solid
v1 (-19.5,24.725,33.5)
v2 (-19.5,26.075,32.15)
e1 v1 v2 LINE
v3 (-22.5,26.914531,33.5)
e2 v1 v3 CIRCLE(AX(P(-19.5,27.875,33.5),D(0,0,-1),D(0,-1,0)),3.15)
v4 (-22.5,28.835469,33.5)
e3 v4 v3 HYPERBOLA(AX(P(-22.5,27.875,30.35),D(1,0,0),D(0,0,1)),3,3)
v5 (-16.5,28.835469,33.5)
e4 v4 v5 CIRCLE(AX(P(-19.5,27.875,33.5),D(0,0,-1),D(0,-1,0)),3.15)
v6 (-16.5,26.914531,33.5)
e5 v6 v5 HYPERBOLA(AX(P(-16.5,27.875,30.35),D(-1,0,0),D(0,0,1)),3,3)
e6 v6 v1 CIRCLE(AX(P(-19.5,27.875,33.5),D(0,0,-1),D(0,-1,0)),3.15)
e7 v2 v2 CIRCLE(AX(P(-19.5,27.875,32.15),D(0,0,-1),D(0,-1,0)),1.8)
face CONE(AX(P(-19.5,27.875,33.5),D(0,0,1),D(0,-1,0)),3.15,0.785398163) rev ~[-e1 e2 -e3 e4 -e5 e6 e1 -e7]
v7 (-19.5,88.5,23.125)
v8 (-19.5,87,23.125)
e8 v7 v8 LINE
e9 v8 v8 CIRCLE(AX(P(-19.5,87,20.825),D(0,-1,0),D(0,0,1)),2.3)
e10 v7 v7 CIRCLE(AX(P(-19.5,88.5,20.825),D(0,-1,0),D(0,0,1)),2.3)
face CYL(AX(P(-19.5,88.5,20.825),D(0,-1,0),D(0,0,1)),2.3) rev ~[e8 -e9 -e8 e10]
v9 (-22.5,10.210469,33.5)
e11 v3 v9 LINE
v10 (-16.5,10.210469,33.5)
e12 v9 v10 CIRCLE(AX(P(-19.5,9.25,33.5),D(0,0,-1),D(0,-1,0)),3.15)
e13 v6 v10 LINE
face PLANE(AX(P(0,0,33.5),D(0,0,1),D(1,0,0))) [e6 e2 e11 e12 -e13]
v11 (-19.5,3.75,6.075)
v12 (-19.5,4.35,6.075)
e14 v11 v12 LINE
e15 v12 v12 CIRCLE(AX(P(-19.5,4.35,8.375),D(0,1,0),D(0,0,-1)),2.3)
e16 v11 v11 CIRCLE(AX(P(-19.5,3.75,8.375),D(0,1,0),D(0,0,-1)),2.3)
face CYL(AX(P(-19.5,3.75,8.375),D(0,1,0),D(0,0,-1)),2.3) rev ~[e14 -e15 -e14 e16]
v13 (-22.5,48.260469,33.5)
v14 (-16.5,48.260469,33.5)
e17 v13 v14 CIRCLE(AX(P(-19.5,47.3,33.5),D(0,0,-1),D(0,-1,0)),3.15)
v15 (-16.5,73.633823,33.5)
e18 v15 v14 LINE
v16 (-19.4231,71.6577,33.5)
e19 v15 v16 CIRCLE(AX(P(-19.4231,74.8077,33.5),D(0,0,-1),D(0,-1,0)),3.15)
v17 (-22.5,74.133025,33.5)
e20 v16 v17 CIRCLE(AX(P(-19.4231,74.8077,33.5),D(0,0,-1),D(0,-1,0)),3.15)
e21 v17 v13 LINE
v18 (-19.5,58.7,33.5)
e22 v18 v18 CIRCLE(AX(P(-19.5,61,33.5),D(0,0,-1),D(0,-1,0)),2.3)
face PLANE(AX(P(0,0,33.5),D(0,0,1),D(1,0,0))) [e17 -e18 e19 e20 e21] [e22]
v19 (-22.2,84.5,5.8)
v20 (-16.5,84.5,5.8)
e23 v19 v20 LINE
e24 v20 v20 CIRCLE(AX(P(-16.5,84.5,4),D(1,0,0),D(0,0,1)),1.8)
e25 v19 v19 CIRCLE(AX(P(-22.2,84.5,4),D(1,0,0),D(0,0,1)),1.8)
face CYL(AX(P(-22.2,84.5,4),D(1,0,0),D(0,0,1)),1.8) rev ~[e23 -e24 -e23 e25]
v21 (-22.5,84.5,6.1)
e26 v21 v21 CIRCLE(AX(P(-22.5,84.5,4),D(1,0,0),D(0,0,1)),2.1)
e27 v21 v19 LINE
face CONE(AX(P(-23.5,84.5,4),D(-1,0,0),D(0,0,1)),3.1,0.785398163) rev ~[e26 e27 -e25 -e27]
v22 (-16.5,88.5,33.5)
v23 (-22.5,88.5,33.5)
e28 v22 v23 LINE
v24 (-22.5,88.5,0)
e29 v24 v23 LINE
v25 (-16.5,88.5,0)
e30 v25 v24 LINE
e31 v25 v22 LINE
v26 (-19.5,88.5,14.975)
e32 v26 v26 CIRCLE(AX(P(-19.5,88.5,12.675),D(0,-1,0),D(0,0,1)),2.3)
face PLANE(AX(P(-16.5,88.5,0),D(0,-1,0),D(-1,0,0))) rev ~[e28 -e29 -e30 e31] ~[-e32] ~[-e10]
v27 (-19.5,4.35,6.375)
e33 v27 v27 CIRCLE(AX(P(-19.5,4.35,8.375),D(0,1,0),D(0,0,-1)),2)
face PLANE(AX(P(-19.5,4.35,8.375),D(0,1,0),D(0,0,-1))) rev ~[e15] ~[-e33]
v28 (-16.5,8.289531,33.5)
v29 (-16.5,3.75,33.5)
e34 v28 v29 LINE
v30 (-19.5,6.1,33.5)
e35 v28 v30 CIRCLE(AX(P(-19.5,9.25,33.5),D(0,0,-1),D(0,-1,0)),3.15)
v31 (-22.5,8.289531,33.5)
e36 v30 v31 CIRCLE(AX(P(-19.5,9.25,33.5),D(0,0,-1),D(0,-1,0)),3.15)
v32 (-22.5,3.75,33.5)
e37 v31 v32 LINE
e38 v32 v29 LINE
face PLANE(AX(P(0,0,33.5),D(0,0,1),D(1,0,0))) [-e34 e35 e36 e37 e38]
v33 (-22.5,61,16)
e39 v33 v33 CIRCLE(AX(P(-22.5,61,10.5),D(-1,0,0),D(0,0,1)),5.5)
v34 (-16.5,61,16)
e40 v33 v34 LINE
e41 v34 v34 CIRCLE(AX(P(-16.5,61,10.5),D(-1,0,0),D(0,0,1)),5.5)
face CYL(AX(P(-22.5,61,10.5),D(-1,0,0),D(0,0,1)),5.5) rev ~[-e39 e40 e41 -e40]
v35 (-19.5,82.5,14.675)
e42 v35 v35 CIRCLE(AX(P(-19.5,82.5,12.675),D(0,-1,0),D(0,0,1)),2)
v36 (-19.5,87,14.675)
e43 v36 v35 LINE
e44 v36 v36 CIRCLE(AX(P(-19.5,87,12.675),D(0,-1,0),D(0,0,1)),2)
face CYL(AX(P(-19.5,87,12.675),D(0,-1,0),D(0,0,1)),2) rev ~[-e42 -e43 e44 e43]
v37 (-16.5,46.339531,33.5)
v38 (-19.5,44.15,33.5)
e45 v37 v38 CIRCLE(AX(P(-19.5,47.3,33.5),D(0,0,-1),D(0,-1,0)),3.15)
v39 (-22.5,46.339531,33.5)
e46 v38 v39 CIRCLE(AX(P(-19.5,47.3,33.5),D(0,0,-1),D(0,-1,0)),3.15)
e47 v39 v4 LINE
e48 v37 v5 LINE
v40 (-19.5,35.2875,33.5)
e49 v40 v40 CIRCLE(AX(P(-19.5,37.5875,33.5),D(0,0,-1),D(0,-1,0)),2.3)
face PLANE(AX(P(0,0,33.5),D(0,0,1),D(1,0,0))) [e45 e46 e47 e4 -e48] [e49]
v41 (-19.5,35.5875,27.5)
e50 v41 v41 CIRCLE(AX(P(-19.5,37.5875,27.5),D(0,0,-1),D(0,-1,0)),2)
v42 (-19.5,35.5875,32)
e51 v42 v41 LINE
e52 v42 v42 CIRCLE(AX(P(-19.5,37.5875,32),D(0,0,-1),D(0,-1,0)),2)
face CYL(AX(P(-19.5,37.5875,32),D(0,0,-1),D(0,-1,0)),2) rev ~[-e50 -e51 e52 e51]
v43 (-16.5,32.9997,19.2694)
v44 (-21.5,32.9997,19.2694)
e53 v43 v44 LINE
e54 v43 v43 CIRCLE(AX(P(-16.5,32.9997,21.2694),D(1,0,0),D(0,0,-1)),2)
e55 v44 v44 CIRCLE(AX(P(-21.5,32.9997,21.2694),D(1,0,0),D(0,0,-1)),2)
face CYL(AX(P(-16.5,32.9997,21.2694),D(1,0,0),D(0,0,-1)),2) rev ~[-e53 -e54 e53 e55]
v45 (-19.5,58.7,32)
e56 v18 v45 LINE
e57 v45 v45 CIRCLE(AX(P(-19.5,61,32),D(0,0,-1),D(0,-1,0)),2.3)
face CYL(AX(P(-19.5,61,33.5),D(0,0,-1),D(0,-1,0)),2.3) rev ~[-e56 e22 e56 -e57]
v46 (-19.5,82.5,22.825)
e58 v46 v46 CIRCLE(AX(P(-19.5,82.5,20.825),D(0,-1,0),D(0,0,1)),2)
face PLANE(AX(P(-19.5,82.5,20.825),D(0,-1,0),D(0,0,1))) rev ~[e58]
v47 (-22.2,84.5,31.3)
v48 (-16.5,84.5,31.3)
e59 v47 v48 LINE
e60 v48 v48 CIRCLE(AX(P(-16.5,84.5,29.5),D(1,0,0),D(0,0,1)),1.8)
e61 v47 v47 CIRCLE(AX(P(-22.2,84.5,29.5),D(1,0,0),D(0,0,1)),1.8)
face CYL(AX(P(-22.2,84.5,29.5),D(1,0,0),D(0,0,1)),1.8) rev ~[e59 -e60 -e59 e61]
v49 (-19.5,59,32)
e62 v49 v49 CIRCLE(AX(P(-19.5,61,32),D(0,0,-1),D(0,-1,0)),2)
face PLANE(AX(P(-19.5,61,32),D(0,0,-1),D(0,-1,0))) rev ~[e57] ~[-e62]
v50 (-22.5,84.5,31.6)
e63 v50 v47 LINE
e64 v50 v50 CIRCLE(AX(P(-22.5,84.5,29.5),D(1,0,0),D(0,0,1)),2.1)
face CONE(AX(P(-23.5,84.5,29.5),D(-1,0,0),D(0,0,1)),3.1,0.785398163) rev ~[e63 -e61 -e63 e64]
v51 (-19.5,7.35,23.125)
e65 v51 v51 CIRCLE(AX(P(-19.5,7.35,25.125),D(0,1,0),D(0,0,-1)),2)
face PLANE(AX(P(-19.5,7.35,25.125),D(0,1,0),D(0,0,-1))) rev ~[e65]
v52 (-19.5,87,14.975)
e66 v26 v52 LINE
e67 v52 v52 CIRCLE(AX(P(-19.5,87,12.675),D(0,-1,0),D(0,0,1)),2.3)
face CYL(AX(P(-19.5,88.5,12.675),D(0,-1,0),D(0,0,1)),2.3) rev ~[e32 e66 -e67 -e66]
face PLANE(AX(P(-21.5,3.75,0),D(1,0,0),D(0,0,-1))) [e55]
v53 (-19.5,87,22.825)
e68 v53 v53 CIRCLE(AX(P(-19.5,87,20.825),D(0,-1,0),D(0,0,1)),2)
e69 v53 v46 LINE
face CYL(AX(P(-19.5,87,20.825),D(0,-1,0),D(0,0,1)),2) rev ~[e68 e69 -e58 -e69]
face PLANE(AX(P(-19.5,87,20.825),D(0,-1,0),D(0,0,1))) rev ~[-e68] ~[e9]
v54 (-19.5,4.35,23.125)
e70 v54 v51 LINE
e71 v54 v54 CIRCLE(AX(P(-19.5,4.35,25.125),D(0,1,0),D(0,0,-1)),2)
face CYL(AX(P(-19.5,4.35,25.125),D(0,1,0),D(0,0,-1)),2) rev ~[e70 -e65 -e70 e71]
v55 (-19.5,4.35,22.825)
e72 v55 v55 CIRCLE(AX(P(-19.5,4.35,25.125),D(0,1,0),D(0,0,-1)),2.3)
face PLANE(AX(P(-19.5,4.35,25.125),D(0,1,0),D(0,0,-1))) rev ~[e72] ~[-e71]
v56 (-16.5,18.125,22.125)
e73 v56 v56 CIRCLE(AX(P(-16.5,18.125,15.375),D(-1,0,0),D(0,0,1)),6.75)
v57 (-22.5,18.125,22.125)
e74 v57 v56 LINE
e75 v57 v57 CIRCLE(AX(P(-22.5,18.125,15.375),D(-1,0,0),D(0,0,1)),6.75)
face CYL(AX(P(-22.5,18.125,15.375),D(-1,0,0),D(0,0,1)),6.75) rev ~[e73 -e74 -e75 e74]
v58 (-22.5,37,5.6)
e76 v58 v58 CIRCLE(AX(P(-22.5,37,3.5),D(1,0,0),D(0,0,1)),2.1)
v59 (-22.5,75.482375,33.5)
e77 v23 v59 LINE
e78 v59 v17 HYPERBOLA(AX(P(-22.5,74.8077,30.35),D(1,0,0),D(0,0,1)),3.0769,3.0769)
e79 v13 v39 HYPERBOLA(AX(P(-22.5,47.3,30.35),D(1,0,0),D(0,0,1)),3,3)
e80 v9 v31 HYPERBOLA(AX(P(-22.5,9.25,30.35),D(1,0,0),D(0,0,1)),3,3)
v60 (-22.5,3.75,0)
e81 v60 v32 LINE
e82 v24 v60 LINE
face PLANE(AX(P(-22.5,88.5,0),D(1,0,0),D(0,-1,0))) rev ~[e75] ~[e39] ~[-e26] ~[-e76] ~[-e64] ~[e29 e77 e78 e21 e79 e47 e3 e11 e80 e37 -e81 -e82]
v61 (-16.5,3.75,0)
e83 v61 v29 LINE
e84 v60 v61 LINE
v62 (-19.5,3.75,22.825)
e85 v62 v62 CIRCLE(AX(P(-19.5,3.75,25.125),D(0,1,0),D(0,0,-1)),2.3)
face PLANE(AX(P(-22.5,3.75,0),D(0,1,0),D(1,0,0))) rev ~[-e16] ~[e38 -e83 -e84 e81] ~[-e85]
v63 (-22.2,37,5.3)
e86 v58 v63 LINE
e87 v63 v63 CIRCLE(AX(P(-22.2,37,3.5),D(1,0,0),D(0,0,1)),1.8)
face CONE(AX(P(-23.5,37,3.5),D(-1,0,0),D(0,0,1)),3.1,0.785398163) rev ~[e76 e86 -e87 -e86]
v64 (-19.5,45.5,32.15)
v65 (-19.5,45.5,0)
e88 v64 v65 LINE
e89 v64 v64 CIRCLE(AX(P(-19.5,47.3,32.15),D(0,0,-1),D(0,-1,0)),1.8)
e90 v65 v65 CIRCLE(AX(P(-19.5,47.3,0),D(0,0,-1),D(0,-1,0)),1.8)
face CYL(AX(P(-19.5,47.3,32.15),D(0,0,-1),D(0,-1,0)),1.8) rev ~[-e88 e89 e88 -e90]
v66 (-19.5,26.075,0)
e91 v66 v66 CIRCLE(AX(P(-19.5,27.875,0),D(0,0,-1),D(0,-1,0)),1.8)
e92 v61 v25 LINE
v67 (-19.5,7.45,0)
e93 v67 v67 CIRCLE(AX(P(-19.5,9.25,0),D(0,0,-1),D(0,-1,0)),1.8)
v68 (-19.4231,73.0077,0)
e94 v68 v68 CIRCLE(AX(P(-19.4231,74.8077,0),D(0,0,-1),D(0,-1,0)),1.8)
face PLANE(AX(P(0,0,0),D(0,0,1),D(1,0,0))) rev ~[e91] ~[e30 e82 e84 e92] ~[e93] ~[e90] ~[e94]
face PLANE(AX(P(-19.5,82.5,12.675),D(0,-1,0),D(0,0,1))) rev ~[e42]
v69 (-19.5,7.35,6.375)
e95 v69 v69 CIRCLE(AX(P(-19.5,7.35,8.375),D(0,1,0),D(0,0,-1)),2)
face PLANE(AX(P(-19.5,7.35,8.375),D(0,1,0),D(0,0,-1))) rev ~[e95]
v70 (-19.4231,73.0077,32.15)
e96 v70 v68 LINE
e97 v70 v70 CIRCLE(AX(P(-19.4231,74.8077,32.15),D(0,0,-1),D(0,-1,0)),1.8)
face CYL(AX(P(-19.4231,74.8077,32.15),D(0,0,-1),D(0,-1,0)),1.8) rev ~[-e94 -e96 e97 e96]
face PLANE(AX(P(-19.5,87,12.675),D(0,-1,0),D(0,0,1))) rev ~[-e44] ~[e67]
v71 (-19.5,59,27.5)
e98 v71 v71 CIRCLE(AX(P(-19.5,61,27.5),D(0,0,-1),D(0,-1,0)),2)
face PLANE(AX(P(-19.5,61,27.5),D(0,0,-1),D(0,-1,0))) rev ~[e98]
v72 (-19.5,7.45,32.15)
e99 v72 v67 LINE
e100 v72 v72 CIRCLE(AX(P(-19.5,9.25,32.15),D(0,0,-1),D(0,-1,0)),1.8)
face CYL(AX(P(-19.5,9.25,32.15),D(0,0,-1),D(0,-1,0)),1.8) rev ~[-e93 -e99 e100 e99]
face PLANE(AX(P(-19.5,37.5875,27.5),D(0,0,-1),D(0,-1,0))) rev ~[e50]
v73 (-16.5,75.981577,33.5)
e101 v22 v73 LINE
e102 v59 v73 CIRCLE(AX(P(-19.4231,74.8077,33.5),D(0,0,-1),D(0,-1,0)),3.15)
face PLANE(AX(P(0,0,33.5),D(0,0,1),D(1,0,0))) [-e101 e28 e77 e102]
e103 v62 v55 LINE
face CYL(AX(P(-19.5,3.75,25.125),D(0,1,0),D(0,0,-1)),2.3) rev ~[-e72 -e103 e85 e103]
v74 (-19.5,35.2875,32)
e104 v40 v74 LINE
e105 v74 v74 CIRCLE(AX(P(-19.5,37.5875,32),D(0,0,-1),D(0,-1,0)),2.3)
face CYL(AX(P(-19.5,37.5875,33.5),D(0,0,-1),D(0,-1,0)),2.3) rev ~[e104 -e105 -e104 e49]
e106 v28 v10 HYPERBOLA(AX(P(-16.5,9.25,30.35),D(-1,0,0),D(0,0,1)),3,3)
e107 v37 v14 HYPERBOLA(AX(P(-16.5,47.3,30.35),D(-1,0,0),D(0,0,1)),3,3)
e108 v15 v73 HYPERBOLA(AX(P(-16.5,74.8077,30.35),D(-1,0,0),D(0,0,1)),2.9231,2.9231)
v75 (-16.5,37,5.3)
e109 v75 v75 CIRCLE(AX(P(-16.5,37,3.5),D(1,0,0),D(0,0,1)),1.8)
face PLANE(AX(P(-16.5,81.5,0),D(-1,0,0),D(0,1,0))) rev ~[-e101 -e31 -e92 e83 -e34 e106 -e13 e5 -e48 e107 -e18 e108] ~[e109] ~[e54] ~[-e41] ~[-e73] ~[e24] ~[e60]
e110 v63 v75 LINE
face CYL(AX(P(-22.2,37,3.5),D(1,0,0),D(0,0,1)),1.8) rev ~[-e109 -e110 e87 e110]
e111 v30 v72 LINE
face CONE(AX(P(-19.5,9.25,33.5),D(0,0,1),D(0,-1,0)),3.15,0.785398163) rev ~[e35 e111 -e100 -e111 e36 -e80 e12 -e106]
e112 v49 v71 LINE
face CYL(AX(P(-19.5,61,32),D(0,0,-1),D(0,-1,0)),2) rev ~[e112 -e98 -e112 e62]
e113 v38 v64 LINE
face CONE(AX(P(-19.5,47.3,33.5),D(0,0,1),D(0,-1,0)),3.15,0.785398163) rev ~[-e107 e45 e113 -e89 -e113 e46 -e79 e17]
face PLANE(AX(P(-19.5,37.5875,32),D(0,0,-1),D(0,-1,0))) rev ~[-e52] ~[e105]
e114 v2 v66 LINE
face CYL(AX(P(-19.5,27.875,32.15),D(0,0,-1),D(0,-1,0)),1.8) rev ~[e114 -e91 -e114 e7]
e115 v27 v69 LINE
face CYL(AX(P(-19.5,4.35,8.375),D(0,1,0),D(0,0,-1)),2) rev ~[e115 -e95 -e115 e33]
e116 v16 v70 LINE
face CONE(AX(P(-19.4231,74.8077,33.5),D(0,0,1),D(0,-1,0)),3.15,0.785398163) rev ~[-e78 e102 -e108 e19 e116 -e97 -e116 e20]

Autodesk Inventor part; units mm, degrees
ref_plane "YZ Plane" through (0, 0, 0) normal (1, 0, 0) x (0, 1, 0)
ref_plane "XZ Plane" through (0, 0, 0) normal (0, 1, 0) x (-1, 0, 0)
ref_plane "Work Plane1" through (0, 0, 0) normal (0, 0, 1) x (1, 0, 0)
sketch "Sketch1" plane through (0, 0, 0) normal (0, 0, 1) x (1, 0, 0)
  line L0 (23.5, 88.5) -> (-23.5, 88.5) projected
  line L1 (-23.5, 88.5) -> (-23.5, 36.5) projected
  line L2 (-26.5, 33.5) -> (-89, 33.5) projected
  line L3 (-89, 33.5) -> (-89, -72.5) projected
  line L4 (-89, -72.5) -> (-77, -72.5) projected
  line L5 (-74, -75.5) -> (-74, -93.5) projected
  line L6 (-74, -93.5) -> (74, -93.5) projected
  line L7 (74, -93.5) -> (74, -75.5) projected
  line L8 (77, -72.5) -> (89, -72.5) projected
  line L9 (89, -72.5) -> (89, 33.5) projected
  line L10 (89, 33.5) -> (26.5, 33.5) projected
  line L11 (23.5, 36.5) -> (23.5, 88.5) projected
  line L12 (-4.5, 81.5) -> (-4.5, 36.5) projected
  line L13 (-7.5, 33.5) -> (-13.5, 33.5) projected
  line L14 (-16.5, 36.5) -> (-16.5, 81.5) projected
  line L15 (-13.5, 84.5) -> (-7.5, 84.5) projected
  line L16 (16.5, 81.5) -> (16.5, 36.5) projected
  line L17 (13.5, 33.5) -> (7.5, 33.5) projected
  line L18 (4.5, 36.5) -> (4.5, 81.5) projected
  line L19 (7.5, 84.5) -> (13.5, 84.5) projected
  line L20 (-16.5, 88.5) -> (-22.5, 88.5)
  line L21 (-22.5, 88.5) -> (-22.5, 3.75)
  line L22 (-22.5, 3.75) -> (-16.5, 3.75)
  line L23 (-16.5, 3.75) -> (-16.5, 88.5)
  line L24 (-32.2, 4.75) -> (-59.9, 4.75)
  arc A0 (13.5, 33.5) -> (16.5, 36.5) centre (13.5, 36.5) ccw projected
  arc A1 (4.5, 36.5) -> (7.5, 33.5) centre (7.5, 36.5) ccw projected
  arc A2 (7.5, 84.5) -> (4.5, 81.5) centre (7.5, 81.5) ccw projected
  arc A3 (16.5, 81.5) -> (13.5, 84.5) centre (13.5, 81.5) ccw projected
  arc A4 (-4.5, 81.5) -> (-7.5, 84.5) centre (-7.5, 81.5) ccw projected
  arc A5 (-7.5, 33.5) -> (-4.5, 36.5) centre (-7.5, 36.5) ccw projected
  arc A6 (-16.5, 36.5) -> (-13.5, 33.5) centre (-13.5, 36.5) ccw projected
  arc A7 (-13.5, 84.5) -> (-16.5, 81.5) centre (-13.5, 81.5) ccw projected
  arc A8 (-26.5, 33.5) -> (-23.5, 36.5) centre (-26.5, 36.5) ccw projected
  arc A9 (-74, -75.5) -> (-77, -72.5) centre (-77, -75.5) ccw projected
  arc A10 (77, -72.5) -> (74, -75.5) centre (77, -75.5) ccw projected
  arc A11 (23.5, 36.5) -> (26.5, 33.5) centre (26.5, 36.5) ccw projected
  point P0 (0, 0)
  point P1 (-16.5, 36.5)
  point P2 (-16.5, 81.5)
  dimension "d0" = 1
  dimension "d2" = 1
ref_plane "Work Plane2" through (-89, -40.3889, 33.5) normal (0, 0, 1) x (1, 0, 0)
extrude "Extrusion1" add sketch "Sketch1" along normal up to surface (33.5 mm away) contours L23 L14 L22 L21 L0
sketch "Sketch2" plane through (-22.5, 3.75, 0) normal (-1, 0, 0) x (0, 0, 1)
  arc A0 (13.7043, 8.7757) -> (14.863, 10.545) centre (10.3771, 12.2188) ccw projected
  arc A1 (14.863, 10.545) -> (15.4685, 10.512) centre (15.375, 14.375) ccw projected
  arc A2 (15.4685, 10.512) -> (16.4285, 8.6275) centre (20.1095, 11.6893) ccw projected
  arc A3 (16.4285, 8.6275) -> (17.3146, 8.863) centre (15.375, 14.375) ccw projected
  arc A4 (17.3146, 8.863) -> (17.2121, 10.9755) centre (12.599, 9.6929) ccw projected
  arc A5 (17.2121, 10.9755) -> (17.7212, 11.3047) centre (15.375, 14.375) ccw projected
  arc A6 (17.7212, 11.3047) -> (19.6056, 10.3444) centre (20.7839, 14.9851) ccw projected
  arc A7 (19.6056, 10.3444) -> (20.184, 11.0558) centre (15.375, 14.375) ccw projected
  arc A8 (20.184, 11.0558) -> (18.8594, 12.7045) centre (15.8813, 8.9554) ccw projected
  arc A9 (18.8594, 12.7045) -> (19.0778, 13.2702) centre (15.375, 14.375) ccw projected
  arc A10 (19.0778, 13.2702) -> (21.1668, 13.6008) centre (19.3923, 18.0479) ccw projected
  arc A11 (21.1668, 13.6008) -> (21.2166, 14.5164) centre (15.375, 14.375) ccw projected
  arc A12 (21.2166, 14.5164) -> (19.1758, 15.0716) centre (18.9701, 10.288) ccw projected
  arc A13 (19.1758, 15.0716) -> (19.02, 15.6576) centre (15.375, 14.375) ccw projected
  arc A14 (19.02, 15.6576) -> (20.5157, 17.153) centre (16.4662, 19.7077) ccw projected
  arc A15 (20.5157, 17.153) -> (20.0178, 17.923) centre (15.375, 14.375) ccw projected
  arc A16 (20.0178, 17.923) -> (18.0404, 17.1726) centre (20.6858, 13.1817) ccw projected
  arc A17 (18.0404, 17.1726) -> (17.57, 17.5552) centre (15.375, 14.375) ccw projected
  arc A18 (17.57, 17.5552) -> (17.9011, 19.644) centre (13.1233, 19.3306) ccw projected
  arc A19 (17.9011, 19.644) -> (17.0457, 19.9743) centre (15.375, 14.375) ccw projected
  arc A20 (17.0457, 19.9743) -> (15.887, 18.205) centre (20.3729, 16.5312) ccw projected
  arc A21 (15.887, 18.205) -> (15.2815, 18.238) centre (15.375, 14.375) ccw projected
  arc A22 (15.2815, 18.238) -> (14.3215, 20.1225) centre (10.6405, 17.0607) ccw projected
  arc A23 (14.3215, 20.1225) -> (13.4354, 19.887) centre (15.375, 14.375) ccw projected
  arc A24 (13.4354, 19.887) -> (13.5379, 17.7745) centre (18.151, 19.0571) ccw projected
  arc A25 (13.5379, 17.7745) -> (13.0288, 17.4453) centre (15.375, 14.375) ccw projected
  arc A26 (13.0288, 17.4453) -> (11.1444, 18.4056) centre (9.9661, 13.7649) ccw projected
  arc A27 (11.1444, 18.4056) -> (10.566, 17.6942) centre (15.375, 14.375) ccw projected
  arc A28 (10.566, 17.6942) -> (11.8906, 16.0455) centre (14.8687, 19.7946) ccw projected
  arc A29 (11.8906, 16.0455) -> (11.6722, 15.4798) centre (15.375, 14.375) ccw projected
  arc A30 (11.6722, 15.4798) -> (9.5832, 15.1492) centre (11.3577, 10.7021) ccw projected
  arc A31 (9.5832, 15.1492) -> (9.5334, 14.2336) centre (15.375, 14.375) ccw projected
  arc A32 (9.5334, 14.2336) -> (11.5742, 13.6784) centre (11.7799, 18.462) ccw projected
  arc A33 (11.5742, 13.6784) -> (11.73, 13.0924) centre (15.375, 14.375) ccw projected
  arc A34 (11.73, 13.0924) -> (10.2343, 11.597) centre (14.2838, 9.0423) ccw projected
  arc A35 (10.2343, 11.597) -> (10.7322, 10.827) centre (15.375, 14.375) ccw projected
  arc A36 (10.7322, 10.827) -> (12.7096, 11.5774) centre (10.0642, 15.5683) ccw projected
  arc A37 (12.7096, 11.5774) -> (13.18, 11.1948) centre (15.375, 14.375) ccw projected
  arc A38 (13.18, 11.1948) -> (12.8489, 9.106) centre (17.6267, 9.4194) ccw projected
  arc A39 (12.8489, 9.106) -> (13.7043, 8.7757) centre (15.375, 14.375) ccw projected
  circle A40 centre (15.375, 14.375) radius 6.75
  circle A41 centre (15.375, 14.375) radius 5.8433
  line L0 (21.2183, 14.375) -> (22.125, 14.375)
  circle A42 centre (10.5, 57.25) radius 5.5 projected
  point P0 (0, -3.75)
  dimension "d6" = 13.5
  dimension "d5" = 0.9067
  dimension "d9" = 11
extrude "Extrusion2" cut sketch "Sketch2" against normal up to next contours A39 A38 A37 A36 A35 A34 A33 A32 A31 A30 A29 A28 A27 A26 A25 A24 A23 A22 A21 A20 A19 A18 A17 A16 A15 A14 A13 A12 A11 A10 A9 A8 A7 A6 A5 A4 A3 A2 A1 A0 | A0 A1 A2 A41 | A41 A36 A37 A38 | A4 A5 A6 A41 | A41 A32 A33 A34 | A8 A9 A10 A41 | A41 A28 A29 A30 | A41 A24 A25 A26 | A12 A13 A14 A41 | A41 A20 A21 A22 | A16 A17 A18 A41 | A40 | A42
sketch "Sketch3" plane through (-16.5, 3.75, 0) normal (1, 0, 0) x (0, 0, -1)
  circle A0 centre (-21.2694, 29.2497) radius 2 projected
  point P0 (0, -3.75)
extrude "Extrusion3" cut sketch "Sketch3" against normal blind 5
ref_plane "Work Plane3" through (-23.5, 3.75, 0) normal (-1, 0, 0) x (0, 0, 1)
sketch "Sketch5" plane through (-23.5, 3.75, 0) normal (-1, 0, 0) x (0, 0, 1)
  circle A0 centre (29.5, 80.75) radius 2.1 projected
  circle A1 centre (4, 80.75) radius 2.1 projected
  circle A2 centre (3.5, 33.25) radius 2.1 projected
  point P0 (0, -3.75)
hole "Hole1" at (-23.5, 84.5, 29.5) at (-23.5, 84.5, 4) at (-23.5, 37, 3.5) direction (1, 0, 0) diameter 3.6 end through all countersink diameter 6.2 countersink angle 90 clearance for "Countersunk Flat Head Screw ISO 2009/7046" size "M3" standard "ISO"
sketch "Sketch6" plane through (-22.5, 3.75, 33.5) normal (0, 0, 1) x (1, 0, 0)
  line L0 (0, 7.625) -> (0, 21.125) projected
  line L1 (1, 31.2497) -> (1, 27.2497) projected
  line L2 (0, 31.15) -> (0, 35.35) projected
  line L3 (0, 51.75) -> (0, 62.75) projected
  line L4 (0, 78.65) -> (0, 82.85) projected
  line L5 (0, 78.65) -> (0, 82.85) projected
  line L6 (6, 0) -> (0, 0) projected
  line L7 (6, 84.75) -> (6, 0) projected
  line L8 (0, 84.75) -> (6, 84.75) projected
  line L9 (0, 0) -> (0, 84.75) projected
  line L10 (6, 27.125) -> (0, 27.125)
  line L11 (0, 27.125) -> (0, 35.35)
  line L12 (0, 35.35) -> (6, 35.35)
  line L13 (6, 35.35) -> (6, 27.125)
  line L14 (0, 7.625) -> (6, 7.625) projected
  line L15 (6, 7.625) -> (0, 7.625)
  line L16 (0, 7.625) -> (0, 21.125)
  line L17 (0, 21.125) -> (6, 21.125)
  line L18 (6, 21.125) -> (6, 7.625)
  line L19 (6, 78.95) -> (0.3, 78.95) projected
  line L20 (6, 84.75) -> (0, 84.75) projected
  line L21 (6, 78.95) -> (0, 78.95)
  line L22 (0, 78.95) -> (0, 84.75)
  line L23 (0, 84.75) -> (6, 84.75)
  line L24 (6, 84.75) -> (6, 78.95)
  line L25 (0, 51.75) -> (6, 51.75) projected
  line L26 (0, 51.75) -> (0, 62.75) projected
  line L27 (6, 51.75) -> (0, 51.75)
  line L28 (0, 51.75) -> (0, 62.75)
  line L29 (0, 62.75) -> (6, 62.75)
  line L30 (6, 62.75) -> (6, 51.75)
  line L31 (6, 0) -> (0, 0)
  line L32 (0, 0) -> (0, 3.7)
  line L33 (0, 3.7) -> (6, 3.7)
  line L34 (6, 3.7) -> (6, 0)
  circle A0 centre (3, 5.5) radius 1.8
  line L35 (6, 21.125) -> (0, 27.125)
  line L36 (0, 21.125) -> (6, 27.125)
  line L37 (6, 35.35) -> (0, 51.75)
  line L38 (0, 35.35) -> (6, 51.75)
  line L39 (0.3, 82.55) -> (0.3, 78.95) projected
  line L40 (6, 62.75) -> (0.3, 78.95)
  line L41 (6, 82.55) -> (6, 78.95) projected
  line L42 (0.3, 78.95) -> (6, 78.95)
  line L43 (6, 78.95) -> (0, 62.75)
  point P0 (22.5, -3.75)
  point P1 (3, 24.125)
  point P2 (3.0769, 71.0577)
  point P3 (3, 43.55)
  dimension "d20" = 3.7
  dimension "d21" = 3.6
  dimension "d22" = 3
  dimension "d23" = 3
hole "Hole2" at (-19.5, 27.875, 33.5) at (-19.5, 9.25, 33.5) at (-19.4231, 74.8077, 33.5) at (-19.5, 47.3, 33.5) direction (0, 0, -1) diameter 3.6 end through all countersink diameter 6.3 countersink angle 90 clearance for "Countersunk Flat Head Screw ISO 2009/7046" size "M3" standard "ISO"
sketch "Sketch7" plane through (-22.5, 3.75, 0) normal (0, -1, 0) x (1, 0, 0)
  line L0 (6, 33.5) -> (0, 33.5) projected
  line L1 (0, 0) -> (0, 33.5) projected
  line L2 (0, 0) -> (6, 0) projected
  line L3 (6, 0) -> (6, 33.5) projected
  line L4 (0, 0) -> (0, 33.5) projected
  line L5 (0, 16.75) -> (6, 16.75)
  line L6 (6, 16.75) -> (0, 33.5)
  line L7 (6, 16.75) -> (0, 0)
  line L8 (6, 0) -> (0, 0) projected
  line L9 (6, 0) -> (0, 16.75)
  line L10 (0, 33.5) -> (6, 33.5) projected
  line L11 (6, 33.5) -> (0, 16.75)
  point P0 (22.5, 0)
  point P1 (3, 25.125)
  point P2 (3, 8.375)
hole "Hole3" at (-19.5, 3.75, 25.125) at (-19.5, 3.75, 8.375) direction (0, 1, 0) diameter 4 depth 3.6 counterbore diameter 4.6 counterbore depth 0.6
sketch "Sketch9" plane through (-22.5, 88.5, 0) normal (0, 1, 0) x (1, 0, 0)
  circle A0 centre (22.5, -20.825) radius 2.3 projected
  circle A1 centre (22.5, -12.675) radius 2.3 projected
  line L0 (18, -33.5) -> (27, -33.5) projected
  line L1 (27, 0) -> (27, -33.5) projected
  line L2 (27, 0) -> (18, 0) projected
  line L3 (18, 0) -> (18, -33.5) projected
  line L4 (22.5, -20.825) -> (0, -20.825)
  line L5 (0, -22.125) -> (0, -8.625) projected
  line L6 (22.5, -12.675) -> (0, -12.675)
  line L7 (6, 0) -> (6, -33.5) projected
  point P0 (22.5, 0)
  point P1 (3, -20.825)
  point P2 (3, -12.675)
  dimension "d45" = 3
  dimension "d46" = 3
  dimension "d47" = 3
  dimension "d48" = 3
hole "Hole5" at (-19.5, 88.5, 20.825) at (-19.5, 88.5, 12.675) direction (0, -1, 0) diameter 4 depth 6 counterbore diameter 4.6 counterbore depth 1.5
sketch "Sketch10" plane through (-19.5, 47.3, 33.5) normal (0, 0, 1) x (1, 0, 0)
  line L0 (-3, 8.2) -> (-3, 19.2) projected
  arc A0 (3, -18.4645) -> (-3, -18.4645) centre (0, -19.425) ccw projected
  arc A1 (-3, -0.9605) -> (3, -0.9605) centre (0, 0) ccw projected
  arc A2 (3, -18.4645) -> (-3, -18.4645) centre (0, -19.425) ccw projected
  line L1 (3, -0.9605) -> (3, -18.4645) projected
  arc A3 (-3, -0.9605) -> (3, -0.9605) centre (0, 0) ccw projected
  line L2 (-3, -18.4645) -> (-3, -0.9605) projected
  line L3 (3, 8.2) -> (-3, 8.2)
  line L4 (3, 19.2) -> (-3, 19.2)
  line L5 (-3, 19.2) -> (3, 8.2)
  line L6 (-3, 8.2) -> (3, 19.2)
  line L7 (3, -18.4645) -> (-3, -0.9605)
  line L8 (-3, -18.4645) -> (3, -0.9605)
  point P0 (19.5, -47.3)
  point P1 (0, -9.7125)
  point P2 (0, 13.7)
hole "Hole6" at (-19.5, 37.5875, 33.5) at (-19.5, 61, 33.5) direction (0, 0, -1) diameter 4 depth 6 counterbore diameter 4.6 counterbore depth 1.5
equation "\"d22\" = d23"
equation "\"d45\" = d46"
equation "\"d47\" = d48"
properties part number "right_gear_holder"
